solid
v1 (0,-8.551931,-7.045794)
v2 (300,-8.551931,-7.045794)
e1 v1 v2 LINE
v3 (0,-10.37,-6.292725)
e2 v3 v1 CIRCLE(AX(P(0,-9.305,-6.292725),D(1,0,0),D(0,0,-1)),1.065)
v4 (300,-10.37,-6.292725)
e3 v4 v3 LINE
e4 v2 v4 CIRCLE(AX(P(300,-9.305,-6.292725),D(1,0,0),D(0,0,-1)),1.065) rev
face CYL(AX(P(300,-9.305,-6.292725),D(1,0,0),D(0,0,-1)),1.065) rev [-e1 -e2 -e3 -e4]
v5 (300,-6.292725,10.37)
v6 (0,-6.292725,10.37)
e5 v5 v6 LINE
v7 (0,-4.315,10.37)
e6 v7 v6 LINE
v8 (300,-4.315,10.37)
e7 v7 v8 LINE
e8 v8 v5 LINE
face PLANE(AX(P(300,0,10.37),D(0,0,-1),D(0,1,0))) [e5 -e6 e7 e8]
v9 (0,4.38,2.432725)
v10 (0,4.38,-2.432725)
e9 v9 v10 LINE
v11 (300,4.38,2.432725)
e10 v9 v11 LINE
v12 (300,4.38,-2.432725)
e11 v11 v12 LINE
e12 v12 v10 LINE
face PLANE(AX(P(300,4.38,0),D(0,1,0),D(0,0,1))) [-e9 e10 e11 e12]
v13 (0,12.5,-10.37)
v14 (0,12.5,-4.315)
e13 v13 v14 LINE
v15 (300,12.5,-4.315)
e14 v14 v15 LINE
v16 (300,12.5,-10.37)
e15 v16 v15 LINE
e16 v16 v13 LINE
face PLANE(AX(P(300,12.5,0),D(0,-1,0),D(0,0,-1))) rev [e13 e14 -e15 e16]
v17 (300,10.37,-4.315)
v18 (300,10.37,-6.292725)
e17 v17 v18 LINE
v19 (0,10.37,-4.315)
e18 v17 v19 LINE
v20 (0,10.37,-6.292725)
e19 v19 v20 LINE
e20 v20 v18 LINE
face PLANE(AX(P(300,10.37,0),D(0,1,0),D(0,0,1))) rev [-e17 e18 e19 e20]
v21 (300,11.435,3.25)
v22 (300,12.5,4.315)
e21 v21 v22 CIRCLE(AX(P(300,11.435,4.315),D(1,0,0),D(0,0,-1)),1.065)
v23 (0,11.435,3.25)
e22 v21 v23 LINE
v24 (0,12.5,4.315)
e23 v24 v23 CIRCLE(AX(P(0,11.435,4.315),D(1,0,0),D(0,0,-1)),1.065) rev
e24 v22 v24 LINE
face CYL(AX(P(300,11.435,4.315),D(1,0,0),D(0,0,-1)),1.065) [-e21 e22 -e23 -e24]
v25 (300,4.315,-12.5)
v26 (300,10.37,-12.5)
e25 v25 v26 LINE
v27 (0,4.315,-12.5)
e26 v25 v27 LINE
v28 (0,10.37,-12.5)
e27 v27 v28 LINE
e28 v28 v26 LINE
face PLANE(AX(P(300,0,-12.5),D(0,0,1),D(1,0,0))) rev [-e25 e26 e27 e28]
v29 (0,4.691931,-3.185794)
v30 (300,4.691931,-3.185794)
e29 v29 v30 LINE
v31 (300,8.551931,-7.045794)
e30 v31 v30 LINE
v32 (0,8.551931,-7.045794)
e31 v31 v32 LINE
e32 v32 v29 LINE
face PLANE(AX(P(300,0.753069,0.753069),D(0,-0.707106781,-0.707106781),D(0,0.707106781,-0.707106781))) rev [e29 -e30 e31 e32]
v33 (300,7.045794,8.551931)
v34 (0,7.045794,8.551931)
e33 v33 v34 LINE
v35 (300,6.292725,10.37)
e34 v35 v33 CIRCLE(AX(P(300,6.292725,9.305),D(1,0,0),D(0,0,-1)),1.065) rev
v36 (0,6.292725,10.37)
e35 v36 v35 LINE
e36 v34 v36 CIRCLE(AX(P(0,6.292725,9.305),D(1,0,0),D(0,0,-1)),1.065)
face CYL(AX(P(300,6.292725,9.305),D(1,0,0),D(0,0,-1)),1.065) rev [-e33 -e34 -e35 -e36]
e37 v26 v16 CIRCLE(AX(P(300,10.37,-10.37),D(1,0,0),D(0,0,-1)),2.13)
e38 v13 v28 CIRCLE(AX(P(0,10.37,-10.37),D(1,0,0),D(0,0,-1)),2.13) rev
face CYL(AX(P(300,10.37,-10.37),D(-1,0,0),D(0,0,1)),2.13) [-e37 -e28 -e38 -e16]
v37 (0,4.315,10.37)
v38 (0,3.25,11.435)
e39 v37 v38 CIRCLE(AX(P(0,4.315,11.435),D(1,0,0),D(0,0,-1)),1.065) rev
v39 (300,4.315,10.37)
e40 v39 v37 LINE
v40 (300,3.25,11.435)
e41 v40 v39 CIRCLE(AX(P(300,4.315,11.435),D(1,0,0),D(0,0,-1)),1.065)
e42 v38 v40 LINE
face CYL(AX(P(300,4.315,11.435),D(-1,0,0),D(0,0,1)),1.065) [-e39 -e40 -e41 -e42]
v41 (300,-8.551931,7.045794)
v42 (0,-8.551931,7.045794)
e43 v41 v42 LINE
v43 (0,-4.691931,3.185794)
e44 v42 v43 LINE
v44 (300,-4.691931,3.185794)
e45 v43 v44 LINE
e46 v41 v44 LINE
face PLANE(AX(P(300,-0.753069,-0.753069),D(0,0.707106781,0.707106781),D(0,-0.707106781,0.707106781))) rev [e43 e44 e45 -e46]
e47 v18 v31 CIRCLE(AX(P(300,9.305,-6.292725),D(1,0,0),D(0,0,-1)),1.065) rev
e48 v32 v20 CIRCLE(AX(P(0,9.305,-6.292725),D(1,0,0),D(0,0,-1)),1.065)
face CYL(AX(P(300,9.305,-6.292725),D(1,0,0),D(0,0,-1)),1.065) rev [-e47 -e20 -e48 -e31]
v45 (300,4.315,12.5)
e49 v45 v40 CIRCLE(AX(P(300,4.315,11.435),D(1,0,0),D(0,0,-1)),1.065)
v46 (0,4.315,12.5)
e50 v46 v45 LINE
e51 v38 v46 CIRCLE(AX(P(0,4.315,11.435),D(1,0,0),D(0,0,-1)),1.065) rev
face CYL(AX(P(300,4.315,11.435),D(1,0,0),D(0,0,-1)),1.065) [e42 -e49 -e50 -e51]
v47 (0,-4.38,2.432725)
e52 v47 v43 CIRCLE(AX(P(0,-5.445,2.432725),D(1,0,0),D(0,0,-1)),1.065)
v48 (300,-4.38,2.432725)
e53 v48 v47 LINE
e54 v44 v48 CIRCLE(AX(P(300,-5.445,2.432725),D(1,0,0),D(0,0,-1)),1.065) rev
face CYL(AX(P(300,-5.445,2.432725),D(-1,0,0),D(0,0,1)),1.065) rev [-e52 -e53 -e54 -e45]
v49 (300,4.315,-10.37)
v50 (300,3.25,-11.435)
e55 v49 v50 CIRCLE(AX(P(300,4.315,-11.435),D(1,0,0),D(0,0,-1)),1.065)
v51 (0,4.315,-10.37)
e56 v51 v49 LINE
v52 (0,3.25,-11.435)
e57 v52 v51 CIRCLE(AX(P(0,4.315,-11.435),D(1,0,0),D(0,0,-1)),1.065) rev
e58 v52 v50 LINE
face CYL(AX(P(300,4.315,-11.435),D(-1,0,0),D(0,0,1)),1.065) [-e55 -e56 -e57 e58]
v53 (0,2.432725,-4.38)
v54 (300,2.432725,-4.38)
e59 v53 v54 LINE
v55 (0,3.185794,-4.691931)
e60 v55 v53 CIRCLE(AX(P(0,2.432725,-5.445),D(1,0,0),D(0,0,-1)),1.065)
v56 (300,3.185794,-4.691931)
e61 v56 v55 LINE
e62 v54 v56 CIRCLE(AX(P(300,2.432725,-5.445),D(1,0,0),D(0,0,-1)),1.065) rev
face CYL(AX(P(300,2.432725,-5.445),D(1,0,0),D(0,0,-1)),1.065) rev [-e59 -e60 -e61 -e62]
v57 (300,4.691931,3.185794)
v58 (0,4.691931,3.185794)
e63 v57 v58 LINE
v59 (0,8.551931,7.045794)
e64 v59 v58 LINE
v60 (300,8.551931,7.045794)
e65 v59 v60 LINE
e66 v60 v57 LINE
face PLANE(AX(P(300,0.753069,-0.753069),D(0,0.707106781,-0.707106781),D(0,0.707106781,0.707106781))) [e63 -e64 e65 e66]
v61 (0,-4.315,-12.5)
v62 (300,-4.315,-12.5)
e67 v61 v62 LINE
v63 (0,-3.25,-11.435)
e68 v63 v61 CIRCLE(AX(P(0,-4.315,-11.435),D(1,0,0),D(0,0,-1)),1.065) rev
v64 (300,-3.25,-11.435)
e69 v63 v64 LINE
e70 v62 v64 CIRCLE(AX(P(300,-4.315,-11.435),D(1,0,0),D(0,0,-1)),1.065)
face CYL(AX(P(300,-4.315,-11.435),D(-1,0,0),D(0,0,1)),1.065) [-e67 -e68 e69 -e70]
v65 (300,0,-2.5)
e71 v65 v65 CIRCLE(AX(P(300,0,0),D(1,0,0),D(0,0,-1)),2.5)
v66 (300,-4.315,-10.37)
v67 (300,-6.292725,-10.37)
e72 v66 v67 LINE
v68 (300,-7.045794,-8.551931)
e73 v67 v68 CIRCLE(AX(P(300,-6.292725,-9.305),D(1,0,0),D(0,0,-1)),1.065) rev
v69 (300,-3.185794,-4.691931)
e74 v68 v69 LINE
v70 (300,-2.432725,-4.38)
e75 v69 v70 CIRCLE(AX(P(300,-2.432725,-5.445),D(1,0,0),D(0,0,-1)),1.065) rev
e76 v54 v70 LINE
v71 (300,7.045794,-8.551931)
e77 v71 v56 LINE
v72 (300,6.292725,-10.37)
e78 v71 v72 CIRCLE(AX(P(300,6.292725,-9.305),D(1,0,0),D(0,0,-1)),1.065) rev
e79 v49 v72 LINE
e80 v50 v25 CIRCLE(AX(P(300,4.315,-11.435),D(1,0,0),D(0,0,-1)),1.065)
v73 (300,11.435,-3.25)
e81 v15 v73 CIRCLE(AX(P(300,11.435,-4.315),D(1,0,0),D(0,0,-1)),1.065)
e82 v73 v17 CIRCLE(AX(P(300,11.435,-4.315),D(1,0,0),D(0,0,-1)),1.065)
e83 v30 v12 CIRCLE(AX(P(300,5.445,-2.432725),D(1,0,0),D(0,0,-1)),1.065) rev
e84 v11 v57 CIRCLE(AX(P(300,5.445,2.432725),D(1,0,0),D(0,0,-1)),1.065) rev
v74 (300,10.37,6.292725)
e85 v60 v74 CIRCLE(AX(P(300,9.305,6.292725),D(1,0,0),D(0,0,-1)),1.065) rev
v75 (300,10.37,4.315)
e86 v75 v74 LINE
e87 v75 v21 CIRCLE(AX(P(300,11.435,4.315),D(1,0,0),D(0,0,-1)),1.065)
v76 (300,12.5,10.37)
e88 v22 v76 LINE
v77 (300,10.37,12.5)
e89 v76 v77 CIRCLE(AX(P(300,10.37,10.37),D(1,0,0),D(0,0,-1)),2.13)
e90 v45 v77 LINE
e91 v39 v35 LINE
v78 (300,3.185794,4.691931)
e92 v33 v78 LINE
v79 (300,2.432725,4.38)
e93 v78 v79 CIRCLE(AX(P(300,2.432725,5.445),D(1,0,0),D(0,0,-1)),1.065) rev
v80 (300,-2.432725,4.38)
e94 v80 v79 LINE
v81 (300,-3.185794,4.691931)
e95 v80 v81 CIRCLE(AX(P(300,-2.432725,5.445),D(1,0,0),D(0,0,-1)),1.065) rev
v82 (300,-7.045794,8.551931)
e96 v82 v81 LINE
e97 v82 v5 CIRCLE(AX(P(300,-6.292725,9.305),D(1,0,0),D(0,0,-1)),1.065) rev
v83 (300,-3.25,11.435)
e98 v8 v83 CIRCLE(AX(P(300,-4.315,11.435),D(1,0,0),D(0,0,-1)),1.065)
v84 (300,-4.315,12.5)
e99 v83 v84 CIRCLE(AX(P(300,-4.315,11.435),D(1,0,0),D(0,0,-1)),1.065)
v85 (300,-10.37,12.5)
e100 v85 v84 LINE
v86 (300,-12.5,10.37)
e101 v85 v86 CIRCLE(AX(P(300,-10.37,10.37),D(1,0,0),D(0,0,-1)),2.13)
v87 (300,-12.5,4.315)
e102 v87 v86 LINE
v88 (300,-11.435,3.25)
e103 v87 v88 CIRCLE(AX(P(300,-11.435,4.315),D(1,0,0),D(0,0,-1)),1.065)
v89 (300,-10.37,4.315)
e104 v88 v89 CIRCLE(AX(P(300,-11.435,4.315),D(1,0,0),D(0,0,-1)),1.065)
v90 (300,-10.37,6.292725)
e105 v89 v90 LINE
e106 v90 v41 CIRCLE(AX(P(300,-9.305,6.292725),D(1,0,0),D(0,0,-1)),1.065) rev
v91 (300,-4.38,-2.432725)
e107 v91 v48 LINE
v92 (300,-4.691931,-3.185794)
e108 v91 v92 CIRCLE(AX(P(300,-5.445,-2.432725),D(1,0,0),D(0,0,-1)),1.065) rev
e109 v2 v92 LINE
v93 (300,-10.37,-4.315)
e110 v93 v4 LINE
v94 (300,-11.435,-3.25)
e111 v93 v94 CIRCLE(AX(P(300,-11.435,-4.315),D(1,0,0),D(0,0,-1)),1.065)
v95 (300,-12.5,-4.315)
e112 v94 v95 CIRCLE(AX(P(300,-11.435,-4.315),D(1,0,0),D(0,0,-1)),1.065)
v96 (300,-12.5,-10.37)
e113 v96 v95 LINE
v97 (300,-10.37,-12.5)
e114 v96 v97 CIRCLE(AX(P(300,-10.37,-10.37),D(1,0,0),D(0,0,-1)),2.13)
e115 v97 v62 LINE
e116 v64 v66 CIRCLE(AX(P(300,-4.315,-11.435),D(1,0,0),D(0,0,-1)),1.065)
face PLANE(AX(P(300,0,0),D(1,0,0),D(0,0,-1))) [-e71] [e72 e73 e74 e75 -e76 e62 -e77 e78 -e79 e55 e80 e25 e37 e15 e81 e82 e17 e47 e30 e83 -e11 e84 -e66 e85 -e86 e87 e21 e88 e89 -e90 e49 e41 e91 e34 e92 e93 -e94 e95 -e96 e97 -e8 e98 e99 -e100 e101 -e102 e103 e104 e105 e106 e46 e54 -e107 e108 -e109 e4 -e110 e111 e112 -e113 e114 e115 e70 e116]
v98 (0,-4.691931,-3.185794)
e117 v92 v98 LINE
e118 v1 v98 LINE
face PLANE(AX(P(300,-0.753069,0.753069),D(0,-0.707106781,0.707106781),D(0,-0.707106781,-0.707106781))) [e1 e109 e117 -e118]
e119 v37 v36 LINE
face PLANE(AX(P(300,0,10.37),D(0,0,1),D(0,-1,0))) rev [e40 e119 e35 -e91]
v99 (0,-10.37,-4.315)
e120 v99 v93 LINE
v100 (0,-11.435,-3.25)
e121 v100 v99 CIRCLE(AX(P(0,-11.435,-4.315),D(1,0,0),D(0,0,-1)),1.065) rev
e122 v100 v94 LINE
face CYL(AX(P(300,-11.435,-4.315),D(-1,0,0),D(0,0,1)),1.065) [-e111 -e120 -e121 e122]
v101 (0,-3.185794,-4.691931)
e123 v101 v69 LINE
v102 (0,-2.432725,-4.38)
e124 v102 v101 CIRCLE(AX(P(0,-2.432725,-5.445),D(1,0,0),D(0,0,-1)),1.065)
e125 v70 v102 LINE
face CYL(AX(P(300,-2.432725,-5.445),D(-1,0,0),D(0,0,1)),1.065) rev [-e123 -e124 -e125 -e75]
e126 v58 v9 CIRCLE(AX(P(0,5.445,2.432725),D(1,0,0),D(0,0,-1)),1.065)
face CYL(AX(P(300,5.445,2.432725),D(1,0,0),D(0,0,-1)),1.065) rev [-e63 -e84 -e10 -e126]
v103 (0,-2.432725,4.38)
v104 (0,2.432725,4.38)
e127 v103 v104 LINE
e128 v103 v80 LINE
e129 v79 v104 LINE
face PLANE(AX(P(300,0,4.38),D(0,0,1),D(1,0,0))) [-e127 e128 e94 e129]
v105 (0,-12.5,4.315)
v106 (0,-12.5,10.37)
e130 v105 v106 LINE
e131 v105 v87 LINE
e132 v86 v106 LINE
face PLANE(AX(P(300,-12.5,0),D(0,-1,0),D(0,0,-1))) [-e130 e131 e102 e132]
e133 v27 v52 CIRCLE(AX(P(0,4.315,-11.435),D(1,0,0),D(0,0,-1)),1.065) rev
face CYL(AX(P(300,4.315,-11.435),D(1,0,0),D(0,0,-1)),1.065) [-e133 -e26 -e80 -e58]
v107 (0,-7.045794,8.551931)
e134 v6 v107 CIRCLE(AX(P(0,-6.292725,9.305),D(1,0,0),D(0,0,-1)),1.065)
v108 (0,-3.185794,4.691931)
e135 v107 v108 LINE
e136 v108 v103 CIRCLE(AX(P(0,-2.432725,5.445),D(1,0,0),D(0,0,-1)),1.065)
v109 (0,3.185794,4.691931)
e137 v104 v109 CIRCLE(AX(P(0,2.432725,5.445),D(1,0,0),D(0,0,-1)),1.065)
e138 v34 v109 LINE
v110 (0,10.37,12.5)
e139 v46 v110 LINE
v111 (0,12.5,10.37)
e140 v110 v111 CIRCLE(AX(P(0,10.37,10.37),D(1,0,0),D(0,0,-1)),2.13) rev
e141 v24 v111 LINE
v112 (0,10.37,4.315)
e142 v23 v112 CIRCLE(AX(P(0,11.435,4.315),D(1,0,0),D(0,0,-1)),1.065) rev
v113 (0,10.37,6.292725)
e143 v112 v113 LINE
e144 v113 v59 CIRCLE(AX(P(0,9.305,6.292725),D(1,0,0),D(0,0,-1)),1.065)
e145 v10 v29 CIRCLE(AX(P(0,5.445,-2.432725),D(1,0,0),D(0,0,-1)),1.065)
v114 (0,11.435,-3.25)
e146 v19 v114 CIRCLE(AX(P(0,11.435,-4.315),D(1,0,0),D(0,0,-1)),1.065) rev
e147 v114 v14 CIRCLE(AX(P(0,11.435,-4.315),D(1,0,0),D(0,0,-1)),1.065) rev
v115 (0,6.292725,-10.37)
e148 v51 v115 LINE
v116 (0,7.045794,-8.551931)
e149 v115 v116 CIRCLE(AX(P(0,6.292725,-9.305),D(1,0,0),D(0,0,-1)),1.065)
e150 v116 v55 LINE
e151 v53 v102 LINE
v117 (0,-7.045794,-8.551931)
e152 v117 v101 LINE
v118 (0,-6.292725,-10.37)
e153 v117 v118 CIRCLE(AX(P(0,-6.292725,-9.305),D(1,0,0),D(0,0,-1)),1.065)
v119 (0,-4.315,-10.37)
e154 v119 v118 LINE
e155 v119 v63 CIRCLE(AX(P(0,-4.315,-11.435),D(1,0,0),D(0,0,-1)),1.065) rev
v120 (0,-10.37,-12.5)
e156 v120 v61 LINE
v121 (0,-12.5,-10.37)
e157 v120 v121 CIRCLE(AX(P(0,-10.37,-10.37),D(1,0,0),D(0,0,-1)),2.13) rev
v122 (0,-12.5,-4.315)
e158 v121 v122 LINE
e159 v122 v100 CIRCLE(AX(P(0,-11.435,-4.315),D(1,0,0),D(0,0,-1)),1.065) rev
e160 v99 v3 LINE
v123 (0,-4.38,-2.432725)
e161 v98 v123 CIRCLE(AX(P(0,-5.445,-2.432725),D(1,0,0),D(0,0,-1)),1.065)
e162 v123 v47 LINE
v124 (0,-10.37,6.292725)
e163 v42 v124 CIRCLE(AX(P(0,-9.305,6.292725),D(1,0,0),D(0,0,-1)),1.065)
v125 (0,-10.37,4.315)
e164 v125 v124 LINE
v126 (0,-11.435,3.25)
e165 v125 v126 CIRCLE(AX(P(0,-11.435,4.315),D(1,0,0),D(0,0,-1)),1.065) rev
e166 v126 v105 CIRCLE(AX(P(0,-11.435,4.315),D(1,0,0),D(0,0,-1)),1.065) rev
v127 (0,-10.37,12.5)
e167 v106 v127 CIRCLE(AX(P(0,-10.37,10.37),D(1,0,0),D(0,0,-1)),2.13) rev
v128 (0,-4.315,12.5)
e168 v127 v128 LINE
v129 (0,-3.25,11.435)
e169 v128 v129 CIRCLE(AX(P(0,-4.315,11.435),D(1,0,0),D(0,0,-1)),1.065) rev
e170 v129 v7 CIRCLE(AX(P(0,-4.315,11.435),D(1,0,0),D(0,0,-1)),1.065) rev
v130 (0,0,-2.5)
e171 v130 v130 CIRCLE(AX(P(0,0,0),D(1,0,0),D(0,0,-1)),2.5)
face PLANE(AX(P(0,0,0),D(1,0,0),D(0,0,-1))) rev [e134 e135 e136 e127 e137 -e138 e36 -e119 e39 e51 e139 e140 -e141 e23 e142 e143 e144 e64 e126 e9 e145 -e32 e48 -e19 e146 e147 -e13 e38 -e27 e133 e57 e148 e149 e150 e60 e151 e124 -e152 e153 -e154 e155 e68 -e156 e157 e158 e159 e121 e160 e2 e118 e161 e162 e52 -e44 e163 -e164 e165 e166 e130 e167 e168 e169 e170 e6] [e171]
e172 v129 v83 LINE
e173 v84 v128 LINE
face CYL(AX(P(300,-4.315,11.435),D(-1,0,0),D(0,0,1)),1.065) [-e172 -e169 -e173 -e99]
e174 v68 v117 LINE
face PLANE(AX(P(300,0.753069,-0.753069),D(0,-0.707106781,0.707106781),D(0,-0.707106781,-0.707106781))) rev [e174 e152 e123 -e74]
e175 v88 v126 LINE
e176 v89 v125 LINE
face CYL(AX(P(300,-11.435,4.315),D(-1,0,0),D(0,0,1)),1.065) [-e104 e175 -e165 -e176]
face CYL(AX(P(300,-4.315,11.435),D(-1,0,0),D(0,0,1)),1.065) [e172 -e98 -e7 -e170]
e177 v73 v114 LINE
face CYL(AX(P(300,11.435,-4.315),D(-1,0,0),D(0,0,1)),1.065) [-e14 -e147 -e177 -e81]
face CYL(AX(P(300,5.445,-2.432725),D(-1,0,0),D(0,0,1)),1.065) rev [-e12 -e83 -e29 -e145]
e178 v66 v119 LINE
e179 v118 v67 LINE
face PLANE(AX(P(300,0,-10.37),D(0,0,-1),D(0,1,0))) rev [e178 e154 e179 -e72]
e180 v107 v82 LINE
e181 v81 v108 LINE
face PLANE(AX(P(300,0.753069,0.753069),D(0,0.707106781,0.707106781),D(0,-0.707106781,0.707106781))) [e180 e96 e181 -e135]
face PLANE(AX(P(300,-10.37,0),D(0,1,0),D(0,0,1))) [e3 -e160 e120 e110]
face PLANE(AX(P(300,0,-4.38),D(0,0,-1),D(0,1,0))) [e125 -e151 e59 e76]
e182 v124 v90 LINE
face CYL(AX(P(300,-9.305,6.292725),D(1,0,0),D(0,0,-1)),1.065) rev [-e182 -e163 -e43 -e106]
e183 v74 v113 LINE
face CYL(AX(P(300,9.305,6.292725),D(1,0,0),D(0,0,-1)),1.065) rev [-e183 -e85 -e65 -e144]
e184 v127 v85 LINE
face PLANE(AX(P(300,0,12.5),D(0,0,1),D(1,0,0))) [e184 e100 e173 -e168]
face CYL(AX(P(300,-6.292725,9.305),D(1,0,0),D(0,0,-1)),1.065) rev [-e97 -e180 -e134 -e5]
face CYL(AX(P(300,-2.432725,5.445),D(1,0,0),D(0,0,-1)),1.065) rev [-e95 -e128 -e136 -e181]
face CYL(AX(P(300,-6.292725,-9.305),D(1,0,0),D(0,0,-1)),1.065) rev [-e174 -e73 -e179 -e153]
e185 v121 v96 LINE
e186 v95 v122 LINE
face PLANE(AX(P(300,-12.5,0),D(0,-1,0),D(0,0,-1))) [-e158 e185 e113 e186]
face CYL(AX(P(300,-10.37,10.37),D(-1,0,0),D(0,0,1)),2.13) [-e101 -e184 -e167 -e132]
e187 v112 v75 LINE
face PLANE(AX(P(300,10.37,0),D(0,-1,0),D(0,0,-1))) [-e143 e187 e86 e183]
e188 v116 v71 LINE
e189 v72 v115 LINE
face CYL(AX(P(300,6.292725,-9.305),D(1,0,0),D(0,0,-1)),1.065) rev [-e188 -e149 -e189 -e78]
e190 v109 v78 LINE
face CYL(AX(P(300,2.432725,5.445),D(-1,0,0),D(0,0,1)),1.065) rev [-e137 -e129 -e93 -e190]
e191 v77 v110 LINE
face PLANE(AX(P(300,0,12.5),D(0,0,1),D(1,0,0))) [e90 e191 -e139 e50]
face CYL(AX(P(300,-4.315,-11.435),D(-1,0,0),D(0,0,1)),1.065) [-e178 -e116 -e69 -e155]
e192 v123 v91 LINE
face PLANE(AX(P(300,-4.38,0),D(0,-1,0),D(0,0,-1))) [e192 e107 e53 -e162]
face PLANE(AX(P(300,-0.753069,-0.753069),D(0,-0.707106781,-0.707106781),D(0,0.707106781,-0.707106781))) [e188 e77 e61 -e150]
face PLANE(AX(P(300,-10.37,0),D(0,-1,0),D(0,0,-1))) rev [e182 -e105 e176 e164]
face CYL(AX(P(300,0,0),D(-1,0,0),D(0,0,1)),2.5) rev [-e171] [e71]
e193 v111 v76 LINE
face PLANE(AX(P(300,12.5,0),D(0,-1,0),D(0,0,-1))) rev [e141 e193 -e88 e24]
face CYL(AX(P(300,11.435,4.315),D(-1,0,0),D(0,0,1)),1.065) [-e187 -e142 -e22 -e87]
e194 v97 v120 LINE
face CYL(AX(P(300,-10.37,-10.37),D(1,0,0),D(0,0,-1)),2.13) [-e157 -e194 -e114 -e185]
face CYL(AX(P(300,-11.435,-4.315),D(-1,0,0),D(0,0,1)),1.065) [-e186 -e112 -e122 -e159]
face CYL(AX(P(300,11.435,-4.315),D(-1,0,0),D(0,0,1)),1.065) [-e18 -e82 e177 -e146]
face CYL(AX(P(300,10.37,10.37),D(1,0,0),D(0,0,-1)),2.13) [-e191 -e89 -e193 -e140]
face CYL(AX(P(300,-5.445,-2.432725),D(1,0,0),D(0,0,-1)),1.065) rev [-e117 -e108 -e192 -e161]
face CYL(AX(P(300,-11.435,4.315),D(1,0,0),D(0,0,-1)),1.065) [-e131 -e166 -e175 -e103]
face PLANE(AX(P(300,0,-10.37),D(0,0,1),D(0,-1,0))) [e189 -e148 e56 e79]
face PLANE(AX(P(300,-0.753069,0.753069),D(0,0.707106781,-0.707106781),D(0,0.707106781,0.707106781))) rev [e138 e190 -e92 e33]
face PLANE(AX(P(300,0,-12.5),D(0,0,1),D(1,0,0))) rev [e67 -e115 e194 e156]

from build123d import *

# Parameters (mm, degrees)
SKETCH1_R           = 2.5
BOSS_EXTRUDE1_DEPTH = 300
FILLET1_R           = 1.065
FILLET2_R           = 2.13


with BuildPart() as part:
    # Sketch1 → Boss-Extrude1 (new body)
    with BuildSketch(Plane.YZ):
        Polygon((-12.5, -3.25), (-12.5, -12.5), (-3.25, -12.5), (-3.25, -10.37), (-8.863862556, -10.37), (-2.873862556, -4.38), (2.873862556, -4.38), (8.863862556, -10.37), (3.25, -10.37), (3.25, -12.5), (12.5, -12.5), (12.5, -3.25), (10.37, -3.25), (10.37, -8.863862556), (4.38, -2.873862556), (4.38, 2.873862556), (10.37, 8.863862556), (10.37, 3.25), (12.5, 3.25), (12.5, 12.5), (3.25, 12.5), (3.25, 10.37), (8.863862556, 10.37), (2.873862556, 4.38), (-2.873862556, 4.38), (-8.863862556, 10.37), (-3.25, 10.37), (-3.25, 12.5), (-12.5, 12.5), (-12.5, 3.25), (-10.37, 3.25), (-10.37, 8.863862556), (-4.38, 2.873862556), (-4.38, -2.873862556), (-10.37, -8.863862556), (-10.37, -3.25), align=None)
        with Locations(Location((0, 0, 0), (0, 0, 270))):
            Circle(SKETCH1_R, mode=Mode.SUBTRACT)
    extrude(amount=BOSS_EXTRUDE1_DEPTH)

    # Fillet1
    fillet1_edges = [part.edges().sort_by_distance(p)[0] for p in [
        (150, -10.37, -8.863862556),
        (150, 2.873862556, -4.38),
        (150, -2.873862556, -4.38),
        (150, -4.38, 2.873862556),
        (150, -4.38, -2.873862556),
        (150, -2.873862556, 4.38),
        (150, 2.873862556, 4.38),
        (150, 4.38, 2.873862556),
        (150, 4.38, -2.873862556),
        (150, -8.863862556, -10.37),
        (150, 8.863862556, -10.37),
        (150, 10.37, -8.863862556),
        (150, -10.37, 8.863862556),
        (150, -8.863862556, 10.37),
        (150, 10.37, 8.863862556),
        (150, 8.863862556, 10.37),
        (150, 12.5, 3.25),
        (150, -3.25, -12.5),
        (150, -10.37, 3.25),
        (150, 10.37, 3.25),
        (150, -10.37, -3.25),
        (150, -12.5, -3.25),
        (150, -12.5, 3.25),
        (150, 3.25, -10.37),
        (150, -3.25, -10.37),
        (150, 3.25, -12.5),
        (150, 10.37, -3.25),
        (150, 12.5, -3.25),
        (150, 3.25, 12.5),
        (150, 3.25, 10.37),
        (150, -3.25, 10.37),
        (150, -3.25, 12.5),
    ]]
    fillet(fillet1_edges, radius=FILLET1_R - 0.0001)  # a hair under: the kernel refuses the full size

    # Fillet2
    fillet2_edges = [part.edges().sort_by_distance(p)[0] for p in [
        (150, -12.5, 12.5),
        (150, 12.5, 12.5),
        (150, 12.5, -12.5),
        (150, -12.5, -12.5),
    ]]
    fillet(fillet2_edges, radius=FILLET2_R)


solid = part.part
